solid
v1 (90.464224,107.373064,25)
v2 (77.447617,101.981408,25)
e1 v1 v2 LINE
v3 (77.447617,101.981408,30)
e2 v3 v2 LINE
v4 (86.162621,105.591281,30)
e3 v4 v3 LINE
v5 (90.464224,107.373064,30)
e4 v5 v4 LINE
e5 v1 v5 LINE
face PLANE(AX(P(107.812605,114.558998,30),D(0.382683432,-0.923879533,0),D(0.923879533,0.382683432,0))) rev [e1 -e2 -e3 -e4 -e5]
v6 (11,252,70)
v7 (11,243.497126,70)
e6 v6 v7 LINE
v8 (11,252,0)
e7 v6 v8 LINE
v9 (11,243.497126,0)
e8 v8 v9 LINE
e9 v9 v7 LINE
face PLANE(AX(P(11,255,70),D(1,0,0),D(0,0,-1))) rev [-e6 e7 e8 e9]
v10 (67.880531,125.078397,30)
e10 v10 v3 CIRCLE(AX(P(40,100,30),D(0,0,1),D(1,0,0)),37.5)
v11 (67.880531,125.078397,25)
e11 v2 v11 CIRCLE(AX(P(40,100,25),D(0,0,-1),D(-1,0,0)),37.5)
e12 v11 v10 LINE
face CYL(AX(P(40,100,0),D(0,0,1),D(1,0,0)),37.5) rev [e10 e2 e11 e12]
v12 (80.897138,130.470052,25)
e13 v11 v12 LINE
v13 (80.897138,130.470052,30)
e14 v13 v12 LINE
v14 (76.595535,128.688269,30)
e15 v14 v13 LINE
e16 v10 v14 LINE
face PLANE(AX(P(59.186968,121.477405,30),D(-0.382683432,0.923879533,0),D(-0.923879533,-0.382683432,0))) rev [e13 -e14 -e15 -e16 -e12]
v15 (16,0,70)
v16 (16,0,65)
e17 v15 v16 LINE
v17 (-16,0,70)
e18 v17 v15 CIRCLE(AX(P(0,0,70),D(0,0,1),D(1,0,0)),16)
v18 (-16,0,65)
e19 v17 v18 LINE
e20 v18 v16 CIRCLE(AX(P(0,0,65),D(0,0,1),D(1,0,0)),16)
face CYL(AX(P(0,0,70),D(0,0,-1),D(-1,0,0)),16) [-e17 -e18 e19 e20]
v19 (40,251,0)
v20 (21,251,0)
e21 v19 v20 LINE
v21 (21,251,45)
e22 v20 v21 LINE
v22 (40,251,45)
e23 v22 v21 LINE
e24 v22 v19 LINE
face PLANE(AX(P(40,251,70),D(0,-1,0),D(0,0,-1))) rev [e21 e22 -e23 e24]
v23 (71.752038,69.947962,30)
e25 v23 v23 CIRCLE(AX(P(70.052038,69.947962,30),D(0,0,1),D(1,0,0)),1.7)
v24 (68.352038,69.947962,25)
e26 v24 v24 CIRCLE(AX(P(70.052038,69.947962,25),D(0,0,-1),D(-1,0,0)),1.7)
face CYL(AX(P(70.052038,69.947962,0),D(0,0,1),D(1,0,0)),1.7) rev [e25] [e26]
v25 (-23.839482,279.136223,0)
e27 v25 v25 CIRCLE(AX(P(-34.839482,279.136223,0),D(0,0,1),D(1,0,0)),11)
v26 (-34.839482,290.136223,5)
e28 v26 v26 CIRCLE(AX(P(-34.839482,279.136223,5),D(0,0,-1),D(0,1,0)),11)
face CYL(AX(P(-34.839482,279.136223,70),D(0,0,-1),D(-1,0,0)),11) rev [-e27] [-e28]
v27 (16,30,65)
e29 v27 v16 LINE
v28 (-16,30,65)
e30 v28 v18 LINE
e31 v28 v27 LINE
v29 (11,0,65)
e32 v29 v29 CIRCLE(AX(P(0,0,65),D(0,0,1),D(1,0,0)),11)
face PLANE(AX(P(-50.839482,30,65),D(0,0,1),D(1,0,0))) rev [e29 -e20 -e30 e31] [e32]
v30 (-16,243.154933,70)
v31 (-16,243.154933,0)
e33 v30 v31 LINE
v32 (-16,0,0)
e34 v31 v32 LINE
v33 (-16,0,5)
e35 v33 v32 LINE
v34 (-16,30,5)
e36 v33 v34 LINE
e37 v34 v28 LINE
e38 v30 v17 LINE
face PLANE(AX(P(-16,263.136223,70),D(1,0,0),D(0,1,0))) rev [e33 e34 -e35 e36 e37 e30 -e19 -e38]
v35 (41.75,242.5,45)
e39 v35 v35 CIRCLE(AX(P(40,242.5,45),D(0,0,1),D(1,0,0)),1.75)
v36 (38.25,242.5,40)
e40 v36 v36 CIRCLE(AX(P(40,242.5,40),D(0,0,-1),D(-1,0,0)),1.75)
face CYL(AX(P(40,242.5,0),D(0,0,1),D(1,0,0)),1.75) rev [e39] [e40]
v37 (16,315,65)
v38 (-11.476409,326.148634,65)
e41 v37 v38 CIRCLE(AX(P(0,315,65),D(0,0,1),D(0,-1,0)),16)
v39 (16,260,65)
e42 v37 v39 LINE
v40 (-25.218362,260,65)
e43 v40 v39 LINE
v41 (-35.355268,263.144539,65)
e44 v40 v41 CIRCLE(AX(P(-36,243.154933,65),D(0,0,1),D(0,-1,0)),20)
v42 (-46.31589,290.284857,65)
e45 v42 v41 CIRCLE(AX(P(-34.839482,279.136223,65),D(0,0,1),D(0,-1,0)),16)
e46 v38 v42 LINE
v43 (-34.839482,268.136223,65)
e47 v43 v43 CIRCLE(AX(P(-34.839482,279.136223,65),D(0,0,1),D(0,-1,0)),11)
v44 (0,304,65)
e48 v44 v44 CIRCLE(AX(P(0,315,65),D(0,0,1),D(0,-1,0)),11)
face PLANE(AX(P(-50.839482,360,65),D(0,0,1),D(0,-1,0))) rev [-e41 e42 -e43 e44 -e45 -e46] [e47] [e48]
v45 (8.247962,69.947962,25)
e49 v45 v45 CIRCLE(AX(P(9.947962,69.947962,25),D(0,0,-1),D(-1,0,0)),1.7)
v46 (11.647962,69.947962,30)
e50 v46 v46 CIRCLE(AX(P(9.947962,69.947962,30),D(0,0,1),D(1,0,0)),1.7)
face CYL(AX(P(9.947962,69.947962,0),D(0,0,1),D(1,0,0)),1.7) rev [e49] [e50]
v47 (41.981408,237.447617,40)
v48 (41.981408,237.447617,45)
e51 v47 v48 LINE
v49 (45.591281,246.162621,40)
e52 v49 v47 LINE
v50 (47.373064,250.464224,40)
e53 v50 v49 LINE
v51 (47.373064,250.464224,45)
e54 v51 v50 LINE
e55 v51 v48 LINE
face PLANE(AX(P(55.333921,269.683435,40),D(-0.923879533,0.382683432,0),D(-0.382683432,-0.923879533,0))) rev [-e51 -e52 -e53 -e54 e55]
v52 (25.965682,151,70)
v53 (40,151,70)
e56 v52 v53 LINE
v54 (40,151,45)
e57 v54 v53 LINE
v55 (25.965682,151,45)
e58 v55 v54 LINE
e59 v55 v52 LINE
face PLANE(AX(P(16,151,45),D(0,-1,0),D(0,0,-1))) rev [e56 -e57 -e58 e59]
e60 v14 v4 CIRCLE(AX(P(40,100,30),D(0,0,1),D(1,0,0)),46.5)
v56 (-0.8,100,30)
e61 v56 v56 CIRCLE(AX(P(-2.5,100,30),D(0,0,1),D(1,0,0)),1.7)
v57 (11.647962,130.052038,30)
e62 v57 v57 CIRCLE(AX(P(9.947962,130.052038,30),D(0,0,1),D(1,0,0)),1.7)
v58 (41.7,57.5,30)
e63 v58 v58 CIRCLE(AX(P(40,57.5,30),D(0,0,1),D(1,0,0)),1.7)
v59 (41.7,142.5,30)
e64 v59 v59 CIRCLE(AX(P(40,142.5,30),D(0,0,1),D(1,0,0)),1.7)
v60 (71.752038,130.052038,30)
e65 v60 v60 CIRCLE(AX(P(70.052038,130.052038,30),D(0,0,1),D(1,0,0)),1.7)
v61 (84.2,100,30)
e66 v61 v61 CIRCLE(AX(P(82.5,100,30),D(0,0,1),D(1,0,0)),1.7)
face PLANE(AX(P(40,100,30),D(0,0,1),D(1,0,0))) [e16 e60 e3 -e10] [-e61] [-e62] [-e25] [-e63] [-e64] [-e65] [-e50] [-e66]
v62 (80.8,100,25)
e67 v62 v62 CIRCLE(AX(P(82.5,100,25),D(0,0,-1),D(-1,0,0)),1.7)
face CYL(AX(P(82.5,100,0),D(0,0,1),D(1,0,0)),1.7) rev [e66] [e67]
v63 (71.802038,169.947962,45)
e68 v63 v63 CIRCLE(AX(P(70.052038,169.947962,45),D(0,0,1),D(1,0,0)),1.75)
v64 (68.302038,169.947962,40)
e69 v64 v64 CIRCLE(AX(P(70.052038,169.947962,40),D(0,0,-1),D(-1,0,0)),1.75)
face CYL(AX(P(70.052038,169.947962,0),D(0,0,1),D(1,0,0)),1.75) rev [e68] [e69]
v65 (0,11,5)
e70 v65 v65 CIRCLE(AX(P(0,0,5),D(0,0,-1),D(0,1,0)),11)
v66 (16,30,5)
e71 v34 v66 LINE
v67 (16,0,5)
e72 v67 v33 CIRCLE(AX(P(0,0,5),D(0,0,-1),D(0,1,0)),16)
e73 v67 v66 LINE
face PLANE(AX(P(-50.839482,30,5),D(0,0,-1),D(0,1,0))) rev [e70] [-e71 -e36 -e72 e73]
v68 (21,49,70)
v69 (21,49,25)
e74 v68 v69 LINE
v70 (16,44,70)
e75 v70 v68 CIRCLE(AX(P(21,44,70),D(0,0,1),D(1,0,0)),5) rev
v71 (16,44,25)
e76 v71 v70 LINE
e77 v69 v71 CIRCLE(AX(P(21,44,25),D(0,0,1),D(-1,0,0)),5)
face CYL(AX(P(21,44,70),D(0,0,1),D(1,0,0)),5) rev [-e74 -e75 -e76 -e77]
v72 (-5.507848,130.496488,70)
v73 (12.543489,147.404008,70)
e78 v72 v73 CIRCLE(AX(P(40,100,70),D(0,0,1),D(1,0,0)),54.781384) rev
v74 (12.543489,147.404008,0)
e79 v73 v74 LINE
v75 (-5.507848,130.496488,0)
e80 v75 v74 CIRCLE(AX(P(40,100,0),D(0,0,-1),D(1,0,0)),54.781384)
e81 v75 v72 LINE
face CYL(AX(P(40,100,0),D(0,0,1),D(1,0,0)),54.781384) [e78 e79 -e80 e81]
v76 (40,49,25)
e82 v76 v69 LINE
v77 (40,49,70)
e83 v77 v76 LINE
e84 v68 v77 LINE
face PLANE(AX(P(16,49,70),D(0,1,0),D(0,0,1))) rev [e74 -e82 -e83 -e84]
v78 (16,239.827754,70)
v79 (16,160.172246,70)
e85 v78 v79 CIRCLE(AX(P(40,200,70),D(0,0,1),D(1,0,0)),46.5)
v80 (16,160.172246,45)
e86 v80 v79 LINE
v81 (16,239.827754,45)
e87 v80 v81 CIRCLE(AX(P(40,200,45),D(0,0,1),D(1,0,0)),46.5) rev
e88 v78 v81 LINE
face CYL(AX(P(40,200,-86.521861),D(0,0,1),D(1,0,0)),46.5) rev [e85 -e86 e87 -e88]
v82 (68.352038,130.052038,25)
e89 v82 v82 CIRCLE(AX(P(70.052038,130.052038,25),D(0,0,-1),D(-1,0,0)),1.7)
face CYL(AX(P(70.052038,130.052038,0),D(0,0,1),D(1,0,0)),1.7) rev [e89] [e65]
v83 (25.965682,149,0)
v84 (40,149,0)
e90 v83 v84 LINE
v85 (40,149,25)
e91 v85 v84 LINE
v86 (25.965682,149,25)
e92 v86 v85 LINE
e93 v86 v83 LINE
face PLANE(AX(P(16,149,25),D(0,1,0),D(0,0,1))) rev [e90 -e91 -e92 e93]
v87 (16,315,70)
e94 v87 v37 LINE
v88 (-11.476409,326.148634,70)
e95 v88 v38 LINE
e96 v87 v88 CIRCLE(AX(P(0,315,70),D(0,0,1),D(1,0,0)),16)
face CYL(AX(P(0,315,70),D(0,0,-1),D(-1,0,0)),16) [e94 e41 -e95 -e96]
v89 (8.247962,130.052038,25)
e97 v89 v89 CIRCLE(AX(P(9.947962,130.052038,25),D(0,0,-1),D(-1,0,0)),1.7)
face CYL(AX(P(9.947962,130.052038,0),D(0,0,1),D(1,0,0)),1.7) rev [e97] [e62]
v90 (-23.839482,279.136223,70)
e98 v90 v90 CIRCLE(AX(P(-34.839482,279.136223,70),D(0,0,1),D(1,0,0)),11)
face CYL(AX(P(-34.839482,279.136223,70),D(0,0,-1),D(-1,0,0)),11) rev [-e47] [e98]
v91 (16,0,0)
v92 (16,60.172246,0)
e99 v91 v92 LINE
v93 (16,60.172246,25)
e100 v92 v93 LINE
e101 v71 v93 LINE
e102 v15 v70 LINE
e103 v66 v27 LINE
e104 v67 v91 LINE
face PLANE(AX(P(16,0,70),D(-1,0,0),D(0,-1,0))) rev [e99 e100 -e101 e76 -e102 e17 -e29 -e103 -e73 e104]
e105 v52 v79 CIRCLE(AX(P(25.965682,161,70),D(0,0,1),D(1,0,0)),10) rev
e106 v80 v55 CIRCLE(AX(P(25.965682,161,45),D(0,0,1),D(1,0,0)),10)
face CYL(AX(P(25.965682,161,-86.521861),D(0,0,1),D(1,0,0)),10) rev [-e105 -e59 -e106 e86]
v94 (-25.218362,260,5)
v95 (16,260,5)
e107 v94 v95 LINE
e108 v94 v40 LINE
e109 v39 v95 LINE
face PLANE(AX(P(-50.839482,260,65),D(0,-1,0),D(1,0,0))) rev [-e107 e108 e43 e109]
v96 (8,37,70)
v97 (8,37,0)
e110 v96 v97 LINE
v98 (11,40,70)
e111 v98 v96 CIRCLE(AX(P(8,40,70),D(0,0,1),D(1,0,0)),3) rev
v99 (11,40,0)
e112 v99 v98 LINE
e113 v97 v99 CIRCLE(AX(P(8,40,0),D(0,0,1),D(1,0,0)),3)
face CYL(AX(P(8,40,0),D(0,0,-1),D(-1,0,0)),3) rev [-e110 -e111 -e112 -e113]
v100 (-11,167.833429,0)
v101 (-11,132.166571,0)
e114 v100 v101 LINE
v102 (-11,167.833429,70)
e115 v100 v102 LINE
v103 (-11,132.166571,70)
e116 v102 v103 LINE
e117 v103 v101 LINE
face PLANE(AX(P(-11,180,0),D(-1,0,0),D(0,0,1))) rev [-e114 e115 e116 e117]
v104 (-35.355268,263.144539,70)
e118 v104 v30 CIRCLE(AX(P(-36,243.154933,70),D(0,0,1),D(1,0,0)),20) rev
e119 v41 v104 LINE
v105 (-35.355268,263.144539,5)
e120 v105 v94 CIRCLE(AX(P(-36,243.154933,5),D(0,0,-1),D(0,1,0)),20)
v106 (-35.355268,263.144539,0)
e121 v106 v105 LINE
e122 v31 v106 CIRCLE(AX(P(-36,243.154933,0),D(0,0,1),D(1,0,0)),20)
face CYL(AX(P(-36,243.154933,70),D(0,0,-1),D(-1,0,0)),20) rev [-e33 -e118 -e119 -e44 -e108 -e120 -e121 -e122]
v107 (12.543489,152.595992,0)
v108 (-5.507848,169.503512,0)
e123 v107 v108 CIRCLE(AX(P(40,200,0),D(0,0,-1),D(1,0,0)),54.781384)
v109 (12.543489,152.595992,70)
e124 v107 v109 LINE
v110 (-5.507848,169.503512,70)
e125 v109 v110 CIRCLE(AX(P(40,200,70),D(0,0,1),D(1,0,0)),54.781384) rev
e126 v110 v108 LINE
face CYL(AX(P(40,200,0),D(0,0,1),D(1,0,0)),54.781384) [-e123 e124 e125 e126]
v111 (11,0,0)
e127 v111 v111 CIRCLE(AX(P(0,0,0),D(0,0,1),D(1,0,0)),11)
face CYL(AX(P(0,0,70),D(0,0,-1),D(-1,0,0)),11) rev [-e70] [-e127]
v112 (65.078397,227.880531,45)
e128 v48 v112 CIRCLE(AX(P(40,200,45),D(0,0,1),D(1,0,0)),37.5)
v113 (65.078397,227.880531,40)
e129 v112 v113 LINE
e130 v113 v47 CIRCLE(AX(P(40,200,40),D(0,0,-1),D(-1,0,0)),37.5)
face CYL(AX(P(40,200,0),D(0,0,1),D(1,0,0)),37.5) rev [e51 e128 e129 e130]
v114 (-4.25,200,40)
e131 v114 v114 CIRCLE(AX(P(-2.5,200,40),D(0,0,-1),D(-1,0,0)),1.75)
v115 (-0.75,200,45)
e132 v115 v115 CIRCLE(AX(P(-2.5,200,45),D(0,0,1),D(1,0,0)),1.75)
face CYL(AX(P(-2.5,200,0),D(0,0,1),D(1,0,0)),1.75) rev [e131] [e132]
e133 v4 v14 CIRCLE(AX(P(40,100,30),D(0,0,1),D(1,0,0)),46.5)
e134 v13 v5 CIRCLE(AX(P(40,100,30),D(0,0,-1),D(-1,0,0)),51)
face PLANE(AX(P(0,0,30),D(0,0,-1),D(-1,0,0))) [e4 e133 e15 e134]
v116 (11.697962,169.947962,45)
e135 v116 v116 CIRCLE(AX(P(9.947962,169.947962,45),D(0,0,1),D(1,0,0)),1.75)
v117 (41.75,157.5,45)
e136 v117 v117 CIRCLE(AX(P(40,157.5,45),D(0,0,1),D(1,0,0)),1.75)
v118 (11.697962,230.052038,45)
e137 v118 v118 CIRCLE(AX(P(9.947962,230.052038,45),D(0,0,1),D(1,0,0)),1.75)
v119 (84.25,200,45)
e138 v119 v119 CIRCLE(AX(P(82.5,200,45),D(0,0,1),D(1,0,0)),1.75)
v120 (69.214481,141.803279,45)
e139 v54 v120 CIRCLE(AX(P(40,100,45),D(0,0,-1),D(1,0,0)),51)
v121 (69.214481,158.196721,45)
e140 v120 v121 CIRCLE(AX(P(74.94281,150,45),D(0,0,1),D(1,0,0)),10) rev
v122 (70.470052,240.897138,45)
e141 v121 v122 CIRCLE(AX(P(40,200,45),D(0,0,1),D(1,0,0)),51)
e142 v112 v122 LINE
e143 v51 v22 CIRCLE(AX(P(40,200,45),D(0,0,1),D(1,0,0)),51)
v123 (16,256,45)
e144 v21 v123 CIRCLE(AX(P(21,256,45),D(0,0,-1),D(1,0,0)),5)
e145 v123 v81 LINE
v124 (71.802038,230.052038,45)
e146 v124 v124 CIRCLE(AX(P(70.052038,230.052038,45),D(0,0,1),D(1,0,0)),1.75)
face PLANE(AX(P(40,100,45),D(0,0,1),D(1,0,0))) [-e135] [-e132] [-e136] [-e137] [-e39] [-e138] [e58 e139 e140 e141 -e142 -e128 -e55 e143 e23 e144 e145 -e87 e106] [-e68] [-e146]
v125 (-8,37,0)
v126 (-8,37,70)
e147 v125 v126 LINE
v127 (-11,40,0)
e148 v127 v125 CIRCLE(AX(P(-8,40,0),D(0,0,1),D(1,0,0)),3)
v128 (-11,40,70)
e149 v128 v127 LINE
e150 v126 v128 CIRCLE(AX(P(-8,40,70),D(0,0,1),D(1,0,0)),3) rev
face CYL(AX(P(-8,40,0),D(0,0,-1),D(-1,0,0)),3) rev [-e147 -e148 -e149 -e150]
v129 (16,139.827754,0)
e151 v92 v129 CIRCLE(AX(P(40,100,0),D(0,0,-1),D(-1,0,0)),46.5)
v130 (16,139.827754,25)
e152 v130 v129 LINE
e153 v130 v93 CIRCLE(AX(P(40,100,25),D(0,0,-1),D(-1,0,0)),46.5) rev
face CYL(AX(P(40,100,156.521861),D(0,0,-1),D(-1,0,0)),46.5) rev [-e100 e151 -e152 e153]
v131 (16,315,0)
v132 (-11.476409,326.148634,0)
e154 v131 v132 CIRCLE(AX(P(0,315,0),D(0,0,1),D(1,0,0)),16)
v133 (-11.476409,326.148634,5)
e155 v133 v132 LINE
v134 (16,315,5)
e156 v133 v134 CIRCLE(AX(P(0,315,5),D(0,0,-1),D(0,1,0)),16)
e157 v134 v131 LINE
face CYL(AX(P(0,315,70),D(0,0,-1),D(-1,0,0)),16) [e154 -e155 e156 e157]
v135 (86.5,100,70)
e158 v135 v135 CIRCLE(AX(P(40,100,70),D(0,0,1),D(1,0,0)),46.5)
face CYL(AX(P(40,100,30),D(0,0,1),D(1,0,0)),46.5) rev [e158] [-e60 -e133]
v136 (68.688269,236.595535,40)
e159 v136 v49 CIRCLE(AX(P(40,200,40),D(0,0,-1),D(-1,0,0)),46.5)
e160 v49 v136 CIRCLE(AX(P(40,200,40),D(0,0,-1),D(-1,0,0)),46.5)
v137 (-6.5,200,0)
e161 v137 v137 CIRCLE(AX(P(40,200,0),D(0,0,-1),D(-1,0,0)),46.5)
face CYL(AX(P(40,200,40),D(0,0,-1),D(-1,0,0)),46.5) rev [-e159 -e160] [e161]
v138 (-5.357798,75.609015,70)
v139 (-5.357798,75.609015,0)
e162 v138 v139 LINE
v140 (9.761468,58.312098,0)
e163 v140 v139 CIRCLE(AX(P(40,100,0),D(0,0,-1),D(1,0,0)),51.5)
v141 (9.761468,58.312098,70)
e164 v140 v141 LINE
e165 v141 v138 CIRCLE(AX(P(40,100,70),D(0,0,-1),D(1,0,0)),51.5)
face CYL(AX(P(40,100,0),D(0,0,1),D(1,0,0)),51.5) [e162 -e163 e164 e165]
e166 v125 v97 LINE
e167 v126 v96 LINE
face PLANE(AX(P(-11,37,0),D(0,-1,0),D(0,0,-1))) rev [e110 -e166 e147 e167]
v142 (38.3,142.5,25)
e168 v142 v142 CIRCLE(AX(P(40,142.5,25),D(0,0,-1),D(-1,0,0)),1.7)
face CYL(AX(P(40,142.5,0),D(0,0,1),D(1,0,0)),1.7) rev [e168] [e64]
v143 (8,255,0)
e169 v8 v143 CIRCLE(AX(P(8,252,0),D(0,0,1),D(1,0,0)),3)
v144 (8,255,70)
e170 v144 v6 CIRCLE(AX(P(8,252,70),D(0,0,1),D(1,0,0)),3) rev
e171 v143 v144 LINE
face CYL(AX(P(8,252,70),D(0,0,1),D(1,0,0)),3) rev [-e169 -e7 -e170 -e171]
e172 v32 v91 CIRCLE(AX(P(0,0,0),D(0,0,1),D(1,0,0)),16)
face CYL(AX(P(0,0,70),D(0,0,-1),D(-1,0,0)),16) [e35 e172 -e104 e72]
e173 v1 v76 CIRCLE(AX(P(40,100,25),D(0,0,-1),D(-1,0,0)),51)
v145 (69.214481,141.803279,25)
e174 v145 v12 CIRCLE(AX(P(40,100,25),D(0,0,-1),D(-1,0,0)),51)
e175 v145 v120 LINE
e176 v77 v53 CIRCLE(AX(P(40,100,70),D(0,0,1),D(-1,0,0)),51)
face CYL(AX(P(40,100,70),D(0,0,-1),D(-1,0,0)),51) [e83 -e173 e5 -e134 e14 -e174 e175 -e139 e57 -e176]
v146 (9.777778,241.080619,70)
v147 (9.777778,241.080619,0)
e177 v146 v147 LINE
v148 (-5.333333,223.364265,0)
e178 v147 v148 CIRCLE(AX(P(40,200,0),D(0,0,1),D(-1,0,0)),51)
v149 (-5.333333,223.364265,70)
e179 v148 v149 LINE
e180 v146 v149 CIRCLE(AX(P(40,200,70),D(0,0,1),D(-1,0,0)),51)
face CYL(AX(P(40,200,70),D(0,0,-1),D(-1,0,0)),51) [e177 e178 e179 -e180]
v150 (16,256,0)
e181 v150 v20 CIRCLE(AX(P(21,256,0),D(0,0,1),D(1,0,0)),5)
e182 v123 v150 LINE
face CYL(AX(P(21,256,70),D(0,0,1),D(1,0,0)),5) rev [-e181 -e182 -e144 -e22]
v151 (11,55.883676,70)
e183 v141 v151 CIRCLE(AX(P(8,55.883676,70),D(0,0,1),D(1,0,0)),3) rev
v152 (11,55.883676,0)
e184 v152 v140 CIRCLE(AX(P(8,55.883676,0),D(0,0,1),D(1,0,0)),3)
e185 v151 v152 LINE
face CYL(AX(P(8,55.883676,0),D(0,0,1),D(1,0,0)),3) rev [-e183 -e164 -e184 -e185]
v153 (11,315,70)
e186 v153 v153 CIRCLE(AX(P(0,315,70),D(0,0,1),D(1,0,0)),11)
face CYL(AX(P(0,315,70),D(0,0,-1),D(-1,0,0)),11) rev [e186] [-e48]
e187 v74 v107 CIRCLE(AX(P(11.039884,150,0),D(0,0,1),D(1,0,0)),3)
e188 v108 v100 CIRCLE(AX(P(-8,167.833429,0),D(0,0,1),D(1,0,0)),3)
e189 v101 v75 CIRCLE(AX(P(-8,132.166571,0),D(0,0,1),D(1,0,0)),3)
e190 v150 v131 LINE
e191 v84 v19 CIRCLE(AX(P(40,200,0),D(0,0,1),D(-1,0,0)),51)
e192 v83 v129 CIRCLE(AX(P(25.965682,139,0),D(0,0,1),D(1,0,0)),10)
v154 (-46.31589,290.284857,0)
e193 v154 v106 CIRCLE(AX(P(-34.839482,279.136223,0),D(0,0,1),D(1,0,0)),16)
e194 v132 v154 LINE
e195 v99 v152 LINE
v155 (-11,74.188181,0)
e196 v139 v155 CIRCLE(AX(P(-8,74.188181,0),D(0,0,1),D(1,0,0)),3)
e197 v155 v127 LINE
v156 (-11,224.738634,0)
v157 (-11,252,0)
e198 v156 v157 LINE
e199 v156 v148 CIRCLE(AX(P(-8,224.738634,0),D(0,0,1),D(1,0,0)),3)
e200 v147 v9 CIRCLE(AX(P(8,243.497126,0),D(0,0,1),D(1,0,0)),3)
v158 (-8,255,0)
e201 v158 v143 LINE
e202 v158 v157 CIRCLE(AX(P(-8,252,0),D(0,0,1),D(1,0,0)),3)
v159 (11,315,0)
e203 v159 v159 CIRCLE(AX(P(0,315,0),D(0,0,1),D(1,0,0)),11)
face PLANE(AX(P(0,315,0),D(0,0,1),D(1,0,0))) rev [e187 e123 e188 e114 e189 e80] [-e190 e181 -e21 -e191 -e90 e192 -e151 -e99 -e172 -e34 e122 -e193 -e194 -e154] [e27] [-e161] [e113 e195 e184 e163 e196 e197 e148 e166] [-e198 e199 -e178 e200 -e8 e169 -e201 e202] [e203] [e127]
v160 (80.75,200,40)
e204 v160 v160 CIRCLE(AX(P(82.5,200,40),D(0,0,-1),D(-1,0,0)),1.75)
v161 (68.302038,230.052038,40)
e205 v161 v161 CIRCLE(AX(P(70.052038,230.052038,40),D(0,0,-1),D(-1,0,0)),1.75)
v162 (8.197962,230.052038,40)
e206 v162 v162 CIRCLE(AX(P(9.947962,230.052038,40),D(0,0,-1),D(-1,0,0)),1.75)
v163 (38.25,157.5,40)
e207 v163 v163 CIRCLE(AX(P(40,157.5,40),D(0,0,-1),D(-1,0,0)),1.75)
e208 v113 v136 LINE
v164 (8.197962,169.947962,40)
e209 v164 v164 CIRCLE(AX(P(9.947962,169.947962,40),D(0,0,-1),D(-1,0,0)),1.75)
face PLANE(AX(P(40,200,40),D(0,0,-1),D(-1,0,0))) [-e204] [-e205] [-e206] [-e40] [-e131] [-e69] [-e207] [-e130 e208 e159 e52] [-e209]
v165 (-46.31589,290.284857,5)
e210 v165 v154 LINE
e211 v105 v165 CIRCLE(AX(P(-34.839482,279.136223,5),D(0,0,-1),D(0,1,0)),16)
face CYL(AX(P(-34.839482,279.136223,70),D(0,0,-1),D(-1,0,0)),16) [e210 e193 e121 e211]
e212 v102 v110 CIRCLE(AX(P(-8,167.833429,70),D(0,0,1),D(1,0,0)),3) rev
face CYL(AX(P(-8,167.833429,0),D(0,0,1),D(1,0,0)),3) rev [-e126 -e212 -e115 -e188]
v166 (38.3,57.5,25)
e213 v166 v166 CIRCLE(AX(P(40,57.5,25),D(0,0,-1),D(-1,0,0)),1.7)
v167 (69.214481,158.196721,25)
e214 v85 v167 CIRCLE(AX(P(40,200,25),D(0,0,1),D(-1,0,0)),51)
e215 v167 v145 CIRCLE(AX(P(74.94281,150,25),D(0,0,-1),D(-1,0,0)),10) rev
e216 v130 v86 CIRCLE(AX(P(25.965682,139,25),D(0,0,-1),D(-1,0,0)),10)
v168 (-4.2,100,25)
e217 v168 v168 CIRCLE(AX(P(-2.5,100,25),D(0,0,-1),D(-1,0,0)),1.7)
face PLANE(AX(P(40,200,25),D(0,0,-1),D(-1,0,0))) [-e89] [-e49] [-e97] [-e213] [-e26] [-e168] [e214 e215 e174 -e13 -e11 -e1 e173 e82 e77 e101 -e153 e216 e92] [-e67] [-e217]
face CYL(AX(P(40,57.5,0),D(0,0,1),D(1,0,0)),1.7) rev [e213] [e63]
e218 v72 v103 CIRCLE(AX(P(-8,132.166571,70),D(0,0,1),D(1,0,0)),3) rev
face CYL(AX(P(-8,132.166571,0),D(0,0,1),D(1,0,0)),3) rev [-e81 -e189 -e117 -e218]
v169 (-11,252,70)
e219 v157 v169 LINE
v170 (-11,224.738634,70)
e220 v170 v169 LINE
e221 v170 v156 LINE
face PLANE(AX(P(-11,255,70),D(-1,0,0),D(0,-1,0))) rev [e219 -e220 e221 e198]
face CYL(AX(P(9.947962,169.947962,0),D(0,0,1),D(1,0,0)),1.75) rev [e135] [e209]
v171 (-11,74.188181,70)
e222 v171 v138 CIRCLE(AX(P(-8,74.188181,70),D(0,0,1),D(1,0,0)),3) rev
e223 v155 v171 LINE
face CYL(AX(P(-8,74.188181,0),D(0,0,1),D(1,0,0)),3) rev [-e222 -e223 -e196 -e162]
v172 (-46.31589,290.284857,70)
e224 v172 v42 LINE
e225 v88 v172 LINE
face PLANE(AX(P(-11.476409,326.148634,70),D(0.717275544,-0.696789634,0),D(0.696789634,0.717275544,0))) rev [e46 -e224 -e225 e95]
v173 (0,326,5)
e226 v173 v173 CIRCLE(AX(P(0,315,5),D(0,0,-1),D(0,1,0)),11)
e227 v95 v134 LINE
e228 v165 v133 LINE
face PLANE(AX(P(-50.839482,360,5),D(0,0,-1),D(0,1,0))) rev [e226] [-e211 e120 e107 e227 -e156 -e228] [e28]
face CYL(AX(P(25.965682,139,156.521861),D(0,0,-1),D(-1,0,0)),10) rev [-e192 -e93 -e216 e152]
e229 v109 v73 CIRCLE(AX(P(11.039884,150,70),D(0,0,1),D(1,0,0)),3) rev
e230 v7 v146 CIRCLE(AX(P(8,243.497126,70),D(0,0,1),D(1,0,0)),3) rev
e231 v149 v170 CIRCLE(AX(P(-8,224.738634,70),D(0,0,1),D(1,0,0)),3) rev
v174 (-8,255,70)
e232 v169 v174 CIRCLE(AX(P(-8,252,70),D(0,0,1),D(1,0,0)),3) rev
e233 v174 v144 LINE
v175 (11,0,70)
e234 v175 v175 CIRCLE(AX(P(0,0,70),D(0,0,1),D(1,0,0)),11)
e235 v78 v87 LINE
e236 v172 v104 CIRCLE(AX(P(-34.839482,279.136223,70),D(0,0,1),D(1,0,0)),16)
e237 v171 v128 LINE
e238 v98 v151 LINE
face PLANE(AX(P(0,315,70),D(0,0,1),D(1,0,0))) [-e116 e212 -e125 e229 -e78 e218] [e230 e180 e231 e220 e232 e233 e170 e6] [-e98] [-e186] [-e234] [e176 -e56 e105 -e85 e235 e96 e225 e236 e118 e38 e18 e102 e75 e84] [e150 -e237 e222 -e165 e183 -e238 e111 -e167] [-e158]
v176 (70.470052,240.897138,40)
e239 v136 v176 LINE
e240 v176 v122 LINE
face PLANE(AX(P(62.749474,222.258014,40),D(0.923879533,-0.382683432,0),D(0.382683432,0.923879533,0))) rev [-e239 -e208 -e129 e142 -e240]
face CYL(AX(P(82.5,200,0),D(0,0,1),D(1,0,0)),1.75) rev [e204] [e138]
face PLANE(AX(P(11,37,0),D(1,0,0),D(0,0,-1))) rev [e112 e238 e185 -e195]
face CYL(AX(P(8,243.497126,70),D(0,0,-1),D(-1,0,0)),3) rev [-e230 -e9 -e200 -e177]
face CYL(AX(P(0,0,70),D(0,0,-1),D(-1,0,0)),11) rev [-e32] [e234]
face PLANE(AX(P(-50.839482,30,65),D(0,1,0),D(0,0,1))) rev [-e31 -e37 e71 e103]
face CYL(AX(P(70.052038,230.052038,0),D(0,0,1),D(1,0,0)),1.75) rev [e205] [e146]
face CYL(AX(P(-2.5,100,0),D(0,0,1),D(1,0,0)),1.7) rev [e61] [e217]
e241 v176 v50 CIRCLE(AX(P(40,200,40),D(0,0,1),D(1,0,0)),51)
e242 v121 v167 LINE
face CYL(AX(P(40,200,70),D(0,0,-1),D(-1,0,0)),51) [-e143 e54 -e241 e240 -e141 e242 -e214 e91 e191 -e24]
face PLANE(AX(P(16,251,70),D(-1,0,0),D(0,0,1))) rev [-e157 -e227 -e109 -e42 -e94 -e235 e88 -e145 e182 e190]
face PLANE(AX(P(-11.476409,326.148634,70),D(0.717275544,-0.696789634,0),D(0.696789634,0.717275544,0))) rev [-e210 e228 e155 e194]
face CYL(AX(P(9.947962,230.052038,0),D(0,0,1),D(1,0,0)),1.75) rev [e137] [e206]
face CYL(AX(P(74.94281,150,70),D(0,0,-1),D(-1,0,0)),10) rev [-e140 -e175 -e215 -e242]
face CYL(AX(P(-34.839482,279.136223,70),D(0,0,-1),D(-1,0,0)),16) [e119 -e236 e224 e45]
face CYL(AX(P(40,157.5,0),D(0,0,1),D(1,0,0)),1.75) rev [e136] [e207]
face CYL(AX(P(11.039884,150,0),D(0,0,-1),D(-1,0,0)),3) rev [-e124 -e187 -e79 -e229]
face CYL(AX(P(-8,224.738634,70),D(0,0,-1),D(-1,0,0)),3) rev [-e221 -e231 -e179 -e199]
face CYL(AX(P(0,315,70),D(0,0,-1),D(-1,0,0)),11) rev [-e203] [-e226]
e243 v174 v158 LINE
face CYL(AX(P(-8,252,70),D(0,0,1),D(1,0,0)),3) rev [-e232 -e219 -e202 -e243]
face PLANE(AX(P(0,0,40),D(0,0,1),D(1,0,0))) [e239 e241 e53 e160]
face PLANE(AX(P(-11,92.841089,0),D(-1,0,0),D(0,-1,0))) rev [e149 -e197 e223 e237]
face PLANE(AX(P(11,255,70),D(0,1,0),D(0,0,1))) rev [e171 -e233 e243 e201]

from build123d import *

# Parameters (mm, degrees)
SKETCH_1_R                = 11
EXTRUDE_1_DEPTH           = 70
FILLET_1_R                = 5
SKETCH_2_R                = 46.5
CUT_EXTRUDE_1_DEPTH       = 40
SKETCH_3_R                = 46.5
CUT_EXTRUDE_2_DEPTH       = 40
CUT_EXTRUDE_3_DEPTH       = 25
CUT_EXTRUDE_START         = -25
CUT_EXTRUDE_4_DEPTH       = 25
CUT_EXTRUDE_START_2       = -30
CUT_EXTRUDE_5_DEPTH       = 30
FILLET_2_R                = 10
CUT_EXTRUDE_6_DEPTH       = 346.603819461
CUT_EXTRUDE_6_DEPTH_BACK  = 346.603819461
SKETCH_8_R                = 37.5
CUT_EXTRUDE_7_DEPTH       = 347.534269631
CUT_EXTRUDE_7_DEPTH_BACK  = 347.534269631
SKETCH_9_W                = 60
SKETCH_9_H                = 60
SKETCH_9_H_2              = 100
CUT_EXTRUDE_8_DEPTH       = 351.34554376
CUT_EXTRUDE_8_DEPTH_BACK  = 351.34554376
CUT_EXTRUDE_9_DEPTH       = 351.34554376
CUT_EXTRUDE_9_DEPTH_BACK  = 351.34554376
FILLET_3_R                = 20
FILLET_4_R                = 3
SKETCH_12_R               = 46.5
CUT_EXTRUDE_10_DEPTH      = 25
SKETCH_13_R               = 46.5
CUT_EXTRUDE_11_DEPTH      = 25
CUT_EXTRUDE_12_DEPTH      = 351.345543854
CUT_EXTRUDE_12_DEPTH_BACK = 351.345543854
FILLET_5_R                = 10
FILLET_6_R                = 3
CUT_EXTRUDE_13_DEPTH      = 346.603819557
CUT_EXTRUDE_13_DEPTH_BACK = 346.603819557
SKETCH_15_R               = 1.75
SKETCH_15_R_2             = 1.7
CUT_EXTRUDE_14_DEPTH      = 5
CUT_EXTRUDE_15_DEPTH      = 5


with BuildPart() as part:
    # 草图1 → 凸台-拉伸1 (new body)
    with BuildSketch(Plane.XY):
        with BuildLine():
            Line((-11.476408706, 326.148634141), (-46.315890396, 290.284856933))
            ThreePointArc((-46.315890396, 290.284856933), (-49.576817715, 272.906381151), (-34.839481689, 263.136222792))
            Line((-34.839481689, 263.136222792), (-16, 263.136222792))
            Line((-16, 263.136222792), (-16, 0))
            ThreePointArc((-16, 0), (0, -16), (16, 0))
            Line((16, 0), (16, 49))
            Line((16, 49), (40, 49))
            ThreePointArc((40, 49), (76.062445841, 63.937554159), (91, 100))
            Line((91, 100), (91, 200))
            ThreePointArc((91, 200), (76.062445841, 236.062445841), (40, 251))
            Line((40, 251), (16, 251))
            Line((16, 251), (16, 315))
            ThreePointArc((16, 315), (6.01570697, 329.82603351), (-11.476408706, 326.148634141))
        make_face()
        with Locations((0, 315)):
            Circle(SKETCH_1_R, mode=Mode.SUBTRACT)
        Circle(SKETCH_1_R, mode=Mode.SUBTRACT)
        with Locations((-34.839481689, 279.136222792)):
            Circle(SKETCH_1_R, mode=Mode.SUBTRACT)
    extrude(amount=EXTRUDE_1_DEPTH)

    # 圆角1
    fillet_1_edges = [part.edges().sort_by_distance(p)[0] for p in [
        (16, 251, 35),
        (16, 49, 35),
    ]]
    fillet(fillet_1_edges, radius=FILLET_1_R)

    # 草图2 → 切除-拉伸1 (cut)
    with BuildSketch(Plane.XY.offset(70)):
        with Locations((40, 100)):
            Circle(SKETCH_2_R)
    extrude(amount=-CUT_EXTRUDE_1_DEPTH, mode=Mode.SUBTRACT)

    # 草图3 → 切除-拉伸2 (cut)
    with BuildSketch(Plane(origin=(0, 0, 0), x_dir=(-1, 0, 0), z_dir=(0, 0, -1))):
        with Locations((-40, 200)):
            Circle(SKETCH_3_R)
    extrude(amount=-CUT_EXTRUDE_2_DEPTH, mode=Mode.SUBTRACT)

    # 草图4 → 切除-拉伸3 (cut)
    with BuildSketch(Plane(origin=(0, 0, 0), x_dir=(-1, 0, 0), z_dir=(0, 0, -1))):
        with BuildLine():
            Line((-16, 44), (-16, 49))
            Line((-16, 49), (-16, 149))
            Line((-16, 149), (-40, 149))
            ThreePointArc((-40, 149), (-76.062445841, 163.937554159), (-91, 200))
            Line((-91, 200), (-91, 100))
            ThreePointArc((-91, 100), (-76.062445841, 63.937554159), (-40, 49))
            Line((-40, 49), (-21, 49))
            ThreePointArc((-21, 49), (-17.464466094, 47.535533906), (-16, 44))
        make_face()
    extrude(amount=-CUT_EXTRUDE_3_DEPTH, mode=Mode.SUBTRACT)

    # 草图5 → 切除-拉伸4 (cut)
    with BuildSketch(Plane.XY.offset(70).offset(CUT_EXTRUDE_START)):
        with BuildLine():
            Line((16, 251), (16, 256))
            ThreePointArc((16, 256), (17.464466094, 252.464466094), (21, 251))
            Line((21, 251), (40, 251))
            ThreePointArc((40, 251), (76.062445841, 236.062445841), (91, 200))
            Line((91, 200), (91, 100))
            ThreePointArc((91, 100), (76.062445841, 136.062445841), (40, 151))
            Line((40, 151), (16, 151))
            Line((16, 151), (16, 251))
        make_face()
    extrude(amount=CUT_EXTRUDE_4_DEPTH, mode=Mode.SUBTRACT)

    # 草图6 → 切除-拉伸5 (cut)
    with BuildSketch(Plane.XY.offset(45).offset(CUT_EXTRUDE_START_2)):
        with BuildLine():
            Line((91, 100), (91, 200))
            ThreePointArc((91, 200), (79.455947946, 167.685480482), (50.049875621, 150))
            ThreePointArc((50.049875621, 150), (79.455947946, 132.314519518), (91, 100))
        make_face()
    extrude(amount=CUT_EXTRUDE_5_DEPTH, mode=Mode.SUBTRACT)

    # 圆角2
    fillet_2_edges = [part.edges().sort_by_distance(p)[0] for p in [
        (50.049875621, 150, 35),
    ]]
    fillet(fillet_2_edges, radius=FILLET_2_R)

    # 草图8 → 切除-拉伸6 (cut, two sides: drawn at the far end of the back side and taken through both)
    with BuildSketch(Plane.XY.offset(30).offset(-CUT_EXTRUDE_6_DEPTH_BACK)):
        with Locations((40, 100)):
            Circle(SKETCH_8_R)
        with Locations(Location((40, 200, 0), (0, 0, 230.2081805))):
            Circle(SKETCH_8_R)
    extrude(amount=CUT_EXTRUDE_6_DEPTH + CUT_EXTRUDE_6_DEPTH_BACK, mode=Mode.SUBTRACT)

    # 草图9 → 切除-拉伸7 (cut, two sides: drawn at the far end of the back side and taken through both)
    with BuildSketch(Plane(origin=(16, 0, 0), x_dir=(0, 0, -1), z_dir=(1, 0, 0)).offset(-CUT_EXTRUDE_7_DEPTH_BACK)):
        with Locations((-35, 0)):
            Rectangle(SKETCH_9_W, SKETCH_9_H)
        with Locations((-35, 310)):
            Rectangle(SKETCH_9_W, SKETCH_9_H_2)
    extrude(amount=CUT_EXTRUDE_7_DEPTH + CUT_EXTRUDE_7_DEPTH_BACK, mode=Mode.SUBTRACT)

    # 草图10 → 切除-拉伸8 (cut, two sides: drawn at the far end of the back side and taken through both)
    with BuildSketch(Plane.XY.offset(70).offset(-CUT_EXTRUDE_8_DEPTH_BACK)):
        with BuildLine():
            Line((-11, 92.841089468), (-11, 37))
            Line((-11, 37), (11, 37))
            Line((11, 37), (11, 57.441217123))
            ThreePointArc((11, 57.441217123), (-3.74114471, 72.816139725), (-11, 92.841089468))
        make_face()
    extrude(amount=CUT_EXTRUDE_8_DEPTH + CUT_EXTRUDE_8_DEPTH_BACK, mode=Mode.SUBTRACT)

    # 草图11 → 切除-拉伸9 (cut, two sides: drawn at the far end of the back side and taken through both)
    with BuildSketch(Plane(origin=(0, 0, 0), x_dir=(-1, 0, 0), z_dir=(0, 0, -1)).offset(-CUT_EXTRUDE_9_DEPTH_BACK)):
        with BuildLine():
            Line((-11, 255), (11, 255))
            Line((11, 255), (11, 200))
            ThreePointArc((11, 200), (5.166359163, 223.685438565), (-11, 241.952353927))
            Line((-11, 241.952353927), (-11, 255))
        make_face()
    extrude(amount=CUT_EXTRUDE_9_DEPTH + CUT_EXTRUDE_9_DEPTH_BACK, mode=Mode.SUBTRACT)

    # 圆角3
    # the kernel refuses this fillet: 20 mm, written as the material it adds along each edge
    with BuildSketch(Plane(origin=(-16, 263.136222792, 0), x_dir=(0, -1, 0), z_dir=(0, 0, 1))) as fillet_3_piece_1_section:
        with BuildLine():
            CenterArc((19.981289544, -20), FILLET_3_R, 90, 88.152657689)
            Line((-0.008315758, -19.355267605), (-2.007276288, -19.290794366))
            ThreePointArc((-2.007276288, -19.290794366), (-2, -18.839481689), (-2, 0))
            Line((-2, 0), (0, 2))
            Line((0, 2), (19.981289544, 2))
            Line((19.981289544, 2), (19.981289544, 0))
        make_face()
    fillet_3_piece_1 = extrude(amount=54.95322386, mode=Mode.PRIVATE)
    fillet_3_piece_1 = split(fillet_3_piece_1, bisect_by=Plane(origin=(-18.420213864, 260, 2.5), z_dir=(0, -1, 0)), keep=Keep.TOP, mode=Mode.PRIVATE)
    add(fillet_3_piece_1)
    with BuildSketch(Plane(origin=(-16, 263.136222792, 0), x_dir=(0, -1, 0), z_dir=(0, 0, 1)), Plane(origin=(-16, 263.136222792, 65), x_dir=(0, -1, 0), z_dir=(0, 0, 1))) as fillet_3_piece_2:
        with BuildLine():
            CenterArc((19.981289544, -20), FILLET_3_R, 90, 88.152657689)
            Line((-0.008315758, -19.355267605), (-2.007276288, -19.290794366))
            ThreePointArc((-2.007276288, -19.290794366), (-2, -18.839481689), (-2, 0))
            Line((-2, 0), (0, 2))
            Line((0, 2), (19.981289544, 2))
            Line((19.981289544, 2), (19.981289544, 0))
        make_face()
    extrude(amount=5)
    with BuildSketch(Plane(origin=(-16, 263.136222792, 15.04677614), x_dir=(0, -1, 0), z_dir=(0, 0, 1))) as fillet_3_piece_3_section:
        with BuildLine():
            CenterArc((19.981289544, -20), FILLET_3_R, 90, 88.152657689)
            Line((-0.008315758, -19.355267605), (-2.007276288, -19.290794366))
            ThreePointArc((-2.007276288, -19.290794366), (-2, -18.839481689), (-2, 0))
            Line((-2, 0), (0, 2))
            Line((0, 2), (19.981289544, 2))
            Line((19.981289544, 2), (19.981289544, 0))
        make_face()
    fillet_3_piece_3 = extrude(amount=54.95322386, mode=Mode.PRIVATE)
    fillet_3_piece_3 = split(fillet_3_piece_3, bisect_by=Plane(origin=(-18.420213864, 260, 40.02338807), z_dir=(0, -1, 0)), keep=Keep.TOP, mode=Mode.PRIVATE)
    add(fillet_3_piece_3)

    # 圆角4
    fillet_4_edges = [part.edges().sort_by_distance(p)[0] for p in [
        (-11, 92.841089468, 35),
        (11, 57.441217123, 35),
        (11, 37, 35),
        (-11, 37, 35),
        (11, 241.952353927, 35),
        (11, 255, 35),
        (-11, 255, 35),
    ]]
    fillet(fillet_4_edges, radius=FILLET_4_R)
    fillet_4_2_edges = [part.edges().sort_by_distance(p)[0] for p in [
        (-11, 200, 35),
    ]]
    fillet(fillet_4_2_edges, radius=FILLET_4_R)

    # 草图12 → 切除-拉伸10 (cut)
    with BuildSketch(Plane(origin=(0, 0, 0), x_dir=(-1, 0, 0), z_dir=(0, 0, -1)).offset(CUT_EXTRUDE_START)):
        with Locations(Location((-40, 100, 0), (0, 0, 180))):
            Circle(SKETCH_12_R)
    extrude(amount=CUT_EXTRUDE_10_DEPTH, mode=Mode.SUBTRACT)

    # 草图13 → 切除-拉伸11 (cut)
    with BuildSketch(Plane.XY.offset(70).offset(CUT_EXTRUDE_START)):
        with Locations(Location((40, 200, 0), (0, 0, 180))):
            Circle(SKETCH_13_R)
    extrude(amount=CUT_EXTRUDE_11_DEPTH, mode=Mode.SUBTRACT)

    # 草图14 → 切除-拉伸12 (cut, two sides: drawn at the far end of the back side and taken through both)
    with BuildSketch(Plane.XY.offset(70).offset(-CUT_EXTRUDE_12_DEPTH_BACK)):
        with BuildLine():
            Line((-11, 180), (-11, 120))
            ThreePointArc((-11, 120), (0.360786501, 137.811807061), (17.616970714, 150))
            ThreePointArc((17.616970714, 150), (0.360786501, 162.188192939), (-11, 180))
        make_face()
    extrude(amount=CUT_EXTRUDE_12_DEPTH + CUT_EXTRUDE_12_DEPTH_BACK, mode=Mode.SUBTRACT)

    # 圆角5
    # the kernel refuses this fillet: 10 mm, written as the material it adds along each edge
    with BuildSketch(Plane(origin=(16, 151, 20.085794328), x_dir=(1, 0, 0), z_dir=(0, 0, 1))) as fillet_5_piece_1:
        with BuildLine():
            CenterArc((9.965682269, 10), FILLET_5_R, 184.748114609, 85.251885391)
            Line((0, 9.172245858), (-0.199313645, 9.155690775))
            ThreePointArc((-0.199313645, 9.155690775), (-0.2, 4.586122929), (-0.2, 0))
            Line((-0.2, 0), (0, -0.2))
            Line((0, -0.2), (9.965682269, -0.2))
            Line((9.965682269, -0.2), (9.965682269, 0))
        make_face()
    extrude(amount=49.914205672)
    with BuildSketch(Plane(origin=(16, 149, 0), x_dir=(0, -1, 0), z_dir=(0, 0, 1))) as fillet_5_piece_2:
        with BuildLine():
            CenterArc((10, 9.965682269), FILLET_5_R, 180, 85.251885391)
            Line((0, 9.965682269), (-0.2, 9.965682269))
            Line((-0.2, 9.965682269), (-0.2, 0))
            Line((-0.2, 0), (0, -0.2))
            ThreePointArc((0, -0.2), (4.586122929, -0.2), (9.155690775, -0.199313645))
            Line((9.155690775, -0.199313645), (9.172245858, 0))
        make_face()
    extrude(amount=49.914205672)

    # 圆角6
    fillet_6_edges = [part.edges().sort_by_distance(p)[0] for p in [
        (-11, 180, 35),
        (17.616970714, 150, 35),
        (-11, 120, 35),
    ]]
    fillet(fillet_6_edges, radius=FILLET_6_R)

    # 草图15 → 切除-拉伸13 (cut, two sides: drawn at the far end of the back side and taken through both)
    with BuildSketch(Plane.XY.offset(30).offset(-CUT_EXTRUDE_13_DEPTH_BACK)):
        with Locations((40, 242.5)):
            Circle(SKETCH_15_R)
        with Locations((70.0520382, 230.0520382)):
            Circle(SKETCH_15_R)
        with Locations((82.5, 200)):
            Circle(SKETCH_15_R)
        with Locations((70.0520382, 169.9479618)):
            Circle(SKETCH_15_R)
        with Locations((40, 157.5)):
            Circle(SKETCH_15_R)
        with Locations((9.9479618, 169.9479618)):
            Circle(SKETCH_15_R)
        with Locations((-2.5, 200)):
            Circle(SKETCH_15_R)
        with Locations((9.9479618, 230.0520382)):
            Circle(SKETCH_15_R)
        with Locations((40, 142.5)):
            Circle(SKETCH_15_R_2)
        with Locations((70.0520382, 130.0520382)):
            Circle(SKETCH_15_R_2)
        with Locations((82.5, 100)):
            Circle(SKETCH_15_R_2)
        with Locations((70.0520382, 69.9479618)):
            Circle(SKETCH_15_R_2)
        with Locations((40, 57.5)):
            Circle(SKETCH_15_R_2)
        with Locations((9.9479618, 69.9479618)):
            Circle(SKETCH_15_R_2)
        with Locations((-2.5, 100)):
            Circle(SKETCH_15_R_2)
        with Locations((9.9479618, 130.0520382)):
            Circle(SKETCH_15_R_2)
    extrude(amount=CUT_EXTRUDE_13_DEPTH + CUT_EXTRUDE_13_DEPTH_BACK, mode=Mode.SUBTRACT)

    # 草图16 → 切除-拉伸14 (cut)
    with BuildSketch(Plane(origin=(0, 0, 25), x_dir=(-1, 0, 0), z_dir=(0, 0, -1))):
        Polygon((-98.245518867, 137.655986366), (-107.812604676, 114.558998053), (-68.754054222, 98.380416728), (-59.186968413, 121.477405041), align=None)
    extrude(amount=-CUT_EXTRUDE_14_DEPTH, mode=Mode.SUBTRACT)

    # 草图17 → 切除-拉伸15 (cut)
    with BuildSketch(Plane.XY.offset(45)):
        Polygon((55.33392121, 269.68343467), (39.652485296, 231.825099411), (62.749473609, 222.258013602), (78.430909522, 260.116348861), align=None)
    extrude(amount=-CUT_EXTRUDE_15_DEPTH, mode=Mode.SUBTRACT)


solid = part.part
